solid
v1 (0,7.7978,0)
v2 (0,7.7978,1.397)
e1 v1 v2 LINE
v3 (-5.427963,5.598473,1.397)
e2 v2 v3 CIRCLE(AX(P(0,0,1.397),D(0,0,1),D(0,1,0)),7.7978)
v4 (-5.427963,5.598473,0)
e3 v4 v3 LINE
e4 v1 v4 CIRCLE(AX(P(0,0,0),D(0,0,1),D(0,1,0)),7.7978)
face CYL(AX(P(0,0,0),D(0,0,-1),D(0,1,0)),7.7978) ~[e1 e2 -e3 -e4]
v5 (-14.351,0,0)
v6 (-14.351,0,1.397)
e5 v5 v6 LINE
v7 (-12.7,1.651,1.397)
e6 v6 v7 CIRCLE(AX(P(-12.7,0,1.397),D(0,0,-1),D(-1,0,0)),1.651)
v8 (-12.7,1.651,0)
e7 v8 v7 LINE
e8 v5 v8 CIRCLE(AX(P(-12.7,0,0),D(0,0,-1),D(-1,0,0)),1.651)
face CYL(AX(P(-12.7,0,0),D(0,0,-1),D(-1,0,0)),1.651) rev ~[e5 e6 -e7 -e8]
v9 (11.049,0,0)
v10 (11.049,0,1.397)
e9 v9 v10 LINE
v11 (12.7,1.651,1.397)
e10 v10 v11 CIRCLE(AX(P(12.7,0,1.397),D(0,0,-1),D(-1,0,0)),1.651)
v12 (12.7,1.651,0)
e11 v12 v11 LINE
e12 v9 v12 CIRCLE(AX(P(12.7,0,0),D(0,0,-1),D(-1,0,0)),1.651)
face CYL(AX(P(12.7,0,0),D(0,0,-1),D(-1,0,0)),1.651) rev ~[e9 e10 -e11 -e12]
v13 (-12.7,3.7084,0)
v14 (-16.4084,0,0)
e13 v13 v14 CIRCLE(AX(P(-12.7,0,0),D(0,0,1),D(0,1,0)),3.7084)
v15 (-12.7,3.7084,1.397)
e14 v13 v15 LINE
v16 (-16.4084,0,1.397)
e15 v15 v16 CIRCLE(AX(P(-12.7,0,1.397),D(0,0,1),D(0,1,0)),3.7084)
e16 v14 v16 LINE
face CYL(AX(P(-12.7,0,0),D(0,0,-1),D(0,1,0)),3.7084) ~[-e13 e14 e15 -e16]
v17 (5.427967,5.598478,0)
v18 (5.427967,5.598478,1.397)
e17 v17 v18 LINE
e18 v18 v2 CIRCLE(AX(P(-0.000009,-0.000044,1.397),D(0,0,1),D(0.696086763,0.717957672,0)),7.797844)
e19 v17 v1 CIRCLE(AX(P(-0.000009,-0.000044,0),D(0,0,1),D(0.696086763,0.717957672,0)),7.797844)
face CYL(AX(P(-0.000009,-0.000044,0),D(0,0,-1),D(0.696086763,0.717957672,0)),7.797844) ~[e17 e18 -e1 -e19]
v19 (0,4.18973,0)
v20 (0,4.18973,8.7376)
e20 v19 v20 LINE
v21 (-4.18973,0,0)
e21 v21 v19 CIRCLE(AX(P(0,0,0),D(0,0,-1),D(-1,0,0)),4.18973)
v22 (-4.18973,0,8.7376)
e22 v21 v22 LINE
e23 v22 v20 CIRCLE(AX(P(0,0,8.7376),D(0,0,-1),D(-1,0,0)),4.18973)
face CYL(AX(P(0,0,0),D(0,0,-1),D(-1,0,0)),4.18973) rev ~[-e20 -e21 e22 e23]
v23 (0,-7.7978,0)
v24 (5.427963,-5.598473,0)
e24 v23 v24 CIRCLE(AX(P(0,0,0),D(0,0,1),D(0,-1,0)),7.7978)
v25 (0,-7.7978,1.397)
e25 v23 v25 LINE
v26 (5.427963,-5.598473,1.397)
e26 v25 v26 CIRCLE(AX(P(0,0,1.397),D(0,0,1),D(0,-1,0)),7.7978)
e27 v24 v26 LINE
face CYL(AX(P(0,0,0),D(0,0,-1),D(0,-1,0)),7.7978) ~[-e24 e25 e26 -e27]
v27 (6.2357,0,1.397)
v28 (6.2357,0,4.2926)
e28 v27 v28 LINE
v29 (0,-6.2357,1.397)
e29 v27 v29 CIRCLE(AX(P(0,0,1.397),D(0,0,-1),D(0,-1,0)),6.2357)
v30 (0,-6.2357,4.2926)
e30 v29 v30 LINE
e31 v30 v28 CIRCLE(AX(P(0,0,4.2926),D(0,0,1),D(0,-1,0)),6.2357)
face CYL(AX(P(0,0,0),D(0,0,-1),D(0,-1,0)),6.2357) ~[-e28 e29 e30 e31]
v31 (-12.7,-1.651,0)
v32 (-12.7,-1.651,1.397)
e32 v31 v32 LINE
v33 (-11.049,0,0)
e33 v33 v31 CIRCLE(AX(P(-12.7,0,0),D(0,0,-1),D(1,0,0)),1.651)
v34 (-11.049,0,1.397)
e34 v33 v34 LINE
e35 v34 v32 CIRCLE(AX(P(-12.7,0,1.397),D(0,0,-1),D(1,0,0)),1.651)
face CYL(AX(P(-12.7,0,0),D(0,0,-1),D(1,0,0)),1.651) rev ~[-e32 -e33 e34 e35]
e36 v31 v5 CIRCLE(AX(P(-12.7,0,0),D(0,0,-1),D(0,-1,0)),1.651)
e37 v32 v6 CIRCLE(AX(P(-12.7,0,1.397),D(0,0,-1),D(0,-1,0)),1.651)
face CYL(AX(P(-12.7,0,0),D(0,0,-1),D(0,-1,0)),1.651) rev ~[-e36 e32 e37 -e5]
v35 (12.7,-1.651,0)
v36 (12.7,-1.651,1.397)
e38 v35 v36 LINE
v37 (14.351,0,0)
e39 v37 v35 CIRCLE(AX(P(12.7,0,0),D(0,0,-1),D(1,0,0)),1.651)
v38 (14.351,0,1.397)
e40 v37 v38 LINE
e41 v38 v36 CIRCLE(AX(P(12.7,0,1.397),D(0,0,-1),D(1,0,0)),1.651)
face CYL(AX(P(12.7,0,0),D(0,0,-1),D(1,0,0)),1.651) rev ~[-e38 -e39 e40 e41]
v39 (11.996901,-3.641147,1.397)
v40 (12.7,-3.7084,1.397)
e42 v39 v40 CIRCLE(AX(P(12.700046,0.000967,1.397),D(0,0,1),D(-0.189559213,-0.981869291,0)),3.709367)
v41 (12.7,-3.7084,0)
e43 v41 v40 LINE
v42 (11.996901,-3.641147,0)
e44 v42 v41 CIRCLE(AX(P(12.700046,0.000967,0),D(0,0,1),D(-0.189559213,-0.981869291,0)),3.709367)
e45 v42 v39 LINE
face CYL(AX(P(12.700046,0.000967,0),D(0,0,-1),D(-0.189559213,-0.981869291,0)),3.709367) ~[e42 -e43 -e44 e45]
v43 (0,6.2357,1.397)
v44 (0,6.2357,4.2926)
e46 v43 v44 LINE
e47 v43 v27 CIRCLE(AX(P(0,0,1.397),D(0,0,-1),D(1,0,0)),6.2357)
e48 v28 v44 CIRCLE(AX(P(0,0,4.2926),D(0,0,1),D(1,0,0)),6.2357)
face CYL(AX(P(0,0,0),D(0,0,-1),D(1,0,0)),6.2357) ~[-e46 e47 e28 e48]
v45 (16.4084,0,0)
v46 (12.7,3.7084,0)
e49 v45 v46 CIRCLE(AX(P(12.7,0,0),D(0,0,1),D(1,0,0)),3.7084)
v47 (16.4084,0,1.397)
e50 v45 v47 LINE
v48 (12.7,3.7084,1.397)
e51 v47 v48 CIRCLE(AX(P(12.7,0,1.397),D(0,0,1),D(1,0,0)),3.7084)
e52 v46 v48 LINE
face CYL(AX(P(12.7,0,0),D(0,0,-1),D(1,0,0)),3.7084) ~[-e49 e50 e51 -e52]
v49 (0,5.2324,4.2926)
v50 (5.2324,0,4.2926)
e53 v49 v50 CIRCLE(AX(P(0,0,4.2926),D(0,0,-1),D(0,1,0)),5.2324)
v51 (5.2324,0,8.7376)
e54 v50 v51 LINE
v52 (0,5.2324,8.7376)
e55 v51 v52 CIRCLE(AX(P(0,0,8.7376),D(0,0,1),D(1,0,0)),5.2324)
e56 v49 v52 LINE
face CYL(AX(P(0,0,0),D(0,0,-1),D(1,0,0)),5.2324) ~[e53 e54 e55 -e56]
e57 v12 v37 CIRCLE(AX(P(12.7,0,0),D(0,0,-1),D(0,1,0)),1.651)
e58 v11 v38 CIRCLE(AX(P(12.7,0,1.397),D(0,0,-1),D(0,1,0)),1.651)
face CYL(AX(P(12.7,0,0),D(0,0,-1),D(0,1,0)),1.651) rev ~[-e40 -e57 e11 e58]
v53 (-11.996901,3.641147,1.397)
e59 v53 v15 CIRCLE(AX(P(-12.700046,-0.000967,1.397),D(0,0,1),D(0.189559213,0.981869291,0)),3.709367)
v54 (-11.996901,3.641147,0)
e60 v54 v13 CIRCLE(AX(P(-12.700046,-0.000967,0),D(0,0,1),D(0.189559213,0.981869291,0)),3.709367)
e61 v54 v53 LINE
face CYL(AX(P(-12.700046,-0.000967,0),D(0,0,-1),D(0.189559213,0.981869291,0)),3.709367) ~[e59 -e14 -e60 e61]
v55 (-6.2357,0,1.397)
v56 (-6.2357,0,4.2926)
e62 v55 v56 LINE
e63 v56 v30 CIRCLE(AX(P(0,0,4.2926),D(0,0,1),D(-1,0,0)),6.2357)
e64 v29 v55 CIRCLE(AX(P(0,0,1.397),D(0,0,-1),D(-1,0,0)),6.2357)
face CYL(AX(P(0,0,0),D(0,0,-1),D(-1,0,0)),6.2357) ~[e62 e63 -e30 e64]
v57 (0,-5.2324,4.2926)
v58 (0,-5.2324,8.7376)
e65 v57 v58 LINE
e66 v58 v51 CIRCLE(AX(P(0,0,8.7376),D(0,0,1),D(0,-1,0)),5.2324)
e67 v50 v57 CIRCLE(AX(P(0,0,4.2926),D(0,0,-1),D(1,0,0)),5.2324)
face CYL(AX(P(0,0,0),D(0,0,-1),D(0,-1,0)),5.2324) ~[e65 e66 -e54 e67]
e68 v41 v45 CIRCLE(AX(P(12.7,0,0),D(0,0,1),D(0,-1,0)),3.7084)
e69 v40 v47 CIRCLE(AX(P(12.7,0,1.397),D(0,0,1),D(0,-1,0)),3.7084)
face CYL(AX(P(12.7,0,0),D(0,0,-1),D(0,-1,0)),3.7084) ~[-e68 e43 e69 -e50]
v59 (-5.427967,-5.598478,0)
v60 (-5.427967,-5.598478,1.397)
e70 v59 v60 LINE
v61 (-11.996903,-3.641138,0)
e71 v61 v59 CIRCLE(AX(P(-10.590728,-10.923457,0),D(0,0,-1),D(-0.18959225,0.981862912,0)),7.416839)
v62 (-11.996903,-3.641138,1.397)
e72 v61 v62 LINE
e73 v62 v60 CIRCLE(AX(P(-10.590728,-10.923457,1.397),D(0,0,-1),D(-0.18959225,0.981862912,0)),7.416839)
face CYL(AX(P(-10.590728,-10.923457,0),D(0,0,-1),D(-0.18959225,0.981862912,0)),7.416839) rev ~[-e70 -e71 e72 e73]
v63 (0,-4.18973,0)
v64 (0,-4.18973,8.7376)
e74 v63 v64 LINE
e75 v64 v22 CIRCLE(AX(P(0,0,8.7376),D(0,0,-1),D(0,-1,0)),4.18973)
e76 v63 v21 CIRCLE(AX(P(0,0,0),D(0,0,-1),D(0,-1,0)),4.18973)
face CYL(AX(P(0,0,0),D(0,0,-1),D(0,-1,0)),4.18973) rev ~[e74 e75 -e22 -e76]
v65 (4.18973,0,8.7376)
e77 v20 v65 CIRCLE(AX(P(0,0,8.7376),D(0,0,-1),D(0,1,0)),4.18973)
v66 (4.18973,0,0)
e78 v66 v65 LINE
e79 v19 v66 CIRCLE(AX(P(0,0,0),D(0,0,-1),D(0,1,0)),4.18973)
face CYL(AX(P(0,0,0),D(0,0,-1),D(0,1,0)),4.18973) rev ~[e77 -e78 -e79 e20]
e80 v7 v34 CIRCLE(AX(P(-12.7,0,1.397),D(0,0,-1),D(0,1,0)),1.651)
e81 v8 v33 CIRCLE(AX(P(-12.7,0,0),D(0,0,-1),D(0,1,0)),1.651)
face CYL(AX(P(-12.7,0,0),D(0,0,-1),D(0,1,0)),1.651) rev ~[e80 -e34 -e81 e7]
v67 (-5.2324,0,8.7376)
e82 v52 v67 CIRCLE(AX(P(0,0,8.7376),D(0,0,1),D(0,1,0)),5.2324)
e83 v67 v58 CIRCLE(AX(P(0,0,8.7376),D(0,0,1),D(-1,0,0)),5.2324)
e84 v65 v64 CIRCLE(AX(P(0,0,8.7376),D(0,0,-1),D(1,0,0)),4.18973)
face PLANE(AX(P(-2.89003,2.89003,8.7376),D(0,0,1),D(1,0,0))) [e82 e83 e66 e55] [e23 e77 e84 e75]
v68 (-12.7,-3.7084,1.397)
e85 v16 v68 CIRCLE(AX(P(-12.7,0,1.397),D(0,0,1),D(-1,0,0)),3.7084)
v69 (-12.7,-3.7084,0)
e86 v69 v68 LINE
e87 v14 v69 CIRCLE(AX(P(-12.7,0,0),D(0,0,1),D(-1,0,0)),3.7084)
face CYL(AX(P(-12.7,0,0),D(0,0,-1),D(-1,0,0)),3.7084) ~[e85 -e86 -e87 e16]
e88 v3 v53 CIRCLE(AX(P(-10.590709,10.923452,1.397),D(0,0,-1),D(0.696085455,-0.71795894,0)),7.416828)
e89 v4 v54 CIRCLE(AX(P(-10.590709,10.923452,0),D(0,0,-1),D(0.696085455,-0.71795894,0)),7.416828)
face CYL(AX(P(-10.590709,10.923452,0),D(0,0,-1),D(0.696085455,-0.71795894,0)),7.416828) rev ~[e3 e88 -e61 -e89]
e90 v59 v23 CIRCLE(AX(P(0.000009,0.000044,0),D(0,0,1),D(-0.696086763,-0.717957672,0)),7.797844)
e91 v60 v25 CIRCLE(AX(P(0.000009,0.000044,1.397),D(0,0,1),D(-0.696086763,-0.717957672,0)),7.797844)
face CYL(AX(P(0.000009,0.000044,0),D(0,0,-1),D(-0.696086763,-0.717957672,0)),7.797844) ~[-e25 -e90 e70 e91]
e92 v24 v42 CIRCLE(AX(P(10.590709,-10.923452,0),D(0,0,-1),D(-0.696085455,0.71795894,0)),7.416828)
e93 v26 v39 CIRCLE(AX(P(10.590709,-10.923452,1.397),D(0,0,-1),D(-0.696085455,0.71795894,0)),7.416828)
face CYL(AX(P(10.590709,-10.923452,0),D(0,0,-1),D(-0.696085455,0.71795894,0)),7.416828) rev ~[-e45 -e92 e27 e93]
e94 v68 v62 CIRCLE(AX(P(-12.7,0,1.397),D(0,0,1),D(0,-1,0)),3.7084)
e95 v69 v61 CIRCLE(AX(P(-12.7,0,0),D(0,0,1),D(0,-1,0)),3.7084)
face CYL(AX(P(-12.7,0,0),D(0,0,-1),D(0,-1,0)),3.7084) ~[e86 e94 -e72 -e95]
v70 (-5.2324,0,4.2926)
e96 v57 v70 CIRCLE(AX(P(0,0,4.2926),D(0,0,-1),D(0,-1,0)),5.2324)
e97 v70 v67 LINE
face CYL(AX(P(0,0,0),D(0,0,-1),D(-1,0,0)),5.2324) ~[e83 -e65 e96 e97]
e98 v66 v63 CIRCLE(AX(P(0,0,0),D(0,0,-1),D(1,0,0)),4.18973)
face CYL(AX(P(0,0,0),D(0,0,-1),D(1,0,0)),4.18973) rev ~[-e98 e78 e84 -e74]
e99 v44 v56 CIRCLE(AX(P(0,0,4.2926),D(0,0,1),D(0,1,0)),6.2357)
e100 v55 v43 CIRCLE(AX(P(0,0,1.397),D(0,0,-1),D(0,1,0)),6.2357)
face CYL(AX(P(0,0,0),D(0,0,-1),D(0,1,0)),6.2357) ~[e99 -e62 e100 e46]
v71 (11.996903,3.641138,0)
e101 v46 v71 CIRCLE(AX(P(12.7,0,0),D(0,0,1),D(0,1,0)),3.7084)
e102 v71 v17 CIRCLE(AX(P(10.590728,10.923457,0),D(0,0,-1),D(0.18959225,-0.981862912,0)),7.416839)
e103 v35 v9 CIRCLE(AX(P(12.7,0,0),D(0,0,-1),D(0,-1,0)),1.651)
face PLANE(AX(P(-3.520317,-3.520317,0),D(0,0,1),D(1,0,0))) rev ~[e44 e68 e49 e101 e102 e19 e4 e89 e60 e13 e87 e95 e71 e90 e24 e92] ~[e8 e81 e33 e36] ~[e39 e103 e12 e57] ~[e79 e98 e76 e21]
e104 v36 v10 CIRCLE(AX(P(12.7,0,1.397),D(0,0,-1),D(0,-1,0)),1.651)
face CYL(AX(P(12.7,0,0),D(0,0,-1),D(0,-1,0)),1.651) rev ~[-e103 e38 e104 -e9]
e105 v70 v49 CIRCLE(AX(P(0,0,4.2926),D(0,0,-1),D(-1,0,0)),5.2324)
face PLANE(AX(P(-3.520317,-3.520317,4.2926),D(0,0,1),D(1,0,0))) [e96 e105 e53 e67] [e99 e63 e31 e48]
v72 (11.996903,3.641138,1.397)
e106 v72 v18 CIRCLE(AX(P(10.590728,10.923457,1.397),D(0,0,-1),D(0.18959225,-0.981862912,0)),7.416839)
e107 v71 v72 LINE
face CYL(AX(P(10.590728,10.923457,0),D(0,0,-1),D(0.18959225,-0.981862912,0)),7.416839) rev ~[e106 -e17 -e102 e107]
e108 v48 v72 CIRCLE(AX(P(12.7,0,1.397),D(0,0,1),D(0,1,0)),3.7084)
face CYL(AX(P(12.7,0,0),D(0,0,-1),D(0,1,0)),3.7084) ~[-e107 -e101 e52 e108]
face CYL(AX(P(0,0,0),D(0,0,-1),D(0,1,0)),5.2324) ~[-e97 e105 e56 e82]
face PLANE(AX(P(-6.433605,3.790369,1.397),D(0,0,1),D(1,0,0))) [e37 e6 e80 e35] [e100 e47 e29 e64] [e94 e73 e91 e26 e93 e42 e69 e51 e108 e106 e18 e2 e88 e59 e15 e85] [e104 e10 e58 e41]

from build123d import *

# Parameters (mm, degrees)
F1_DEPTH = 1.397
F2_DEPTH = 8.7376
F3_DEPTH = 4.2926


# Not quite as in the source:
# - ends of sketch curves that miss each other by under 0.0002 mm in the source are joined


with BuildPart() as f1:
    # F0 (on Top) → F1 (new body)
    with BuildSketch(Plane.XY):
        with BuildLine():
            ThreePointArc((-6.2357, 0), (-4.4093057554, 4.4093057554), (0, 6.2357))
            Line((0, 6.2357), (0, 7.7978))
            ThreePointArc((0, 7.7978), (-2.9283023582, 7.2270831003), (-5.4279628833, 5.5984733435))
            ThreePointArc((-5.4279628833, 5.5984733435), (-8.4727612853, 3.8154532948), (-11.9969014896, 3.6411465506))
            ThreePointArc((-11.9969014896, 3.6411465506), (-12.3468465773, 3.6915461828), (-12.7, 3.7084))
            Line((-12.7, 3.7084), (-12.7, 1.651))
            ThreePointArc((-12.7, 1.651), (-11.5325667043, 1.1674332957), (-11.049, 0))
            Line((-11.049, 0), (-6.2357, 0))
        make_face()
        with BuildLine():
            ThreePointArc((-14.351, 0), (-13.8674332957, 1.1674332957), (-12.7, 1.651))
            Line((-12.7, 1.651), (-12.7, 3.7084))
            ThreePointArc((-12.7, 3.7084), (-15.3222347874, 2.6222347874), (-16.4084, 0))
            Line((-16.4084, 0), (-14.351, 0))
        make_face()
        with BuildLine():
            Line((-12.7, -3.7084), (-12.7, -1.651))
            ThreePointArc((-12.7, -1.651), (-13.8674332957, -1.1674332957), (-14.351, 0))
            Line((-14.351, 0), (-16.4084, 0))
            ThreePointArc((-16.4084, 0), (-15.3222347874, -2.6222347874), (-12.7, -3.7084))
        make_face()
        with BuildLine():
            Line((0, -7.7978), (0, -6.2357))
            ThreePointArc((0, -6.2357), (-4.4093057554, -4.4093057554), (-6.2357, 0))
            Line((-6.2357, 0), (-11.049, 0))
            ThreePointArc((-11.049, 0), (-11.5325667043, -1.1674332957), (-12.7, -1.651))
            Line((-12.7, -1.651), (-12.7, -3.7084))
            ThreePointArc((-12.7, -3.7084), (-12.3468465773, -3.6915461828), (-11.9969031552, -3.6411379247))
            ThreePointArc((-11.9969031552, -3.6411379247), (-8.4727612853, -3.8154532948), (-5.4279673549, -5.5984779556))
            ThreePointArc((-5.4279673549, -5.5984779556), (-2.9283023582, -7.2270831003), (0, -7.7978))
        make_face()
        with BuildLine():
            ThreePointArc((0, -6.2357), (4.4093057554, -4.4093057554), (6.2357, 0))
            Line((6.2357, 0), (5.2324, 0))
            ThreePointArc((5.2324, 0), (3.6998655219, -3.6998655219), (0, -5.2324))
            Line((0, -5.2324), (0, -6.2357))
        make_face()
        with BuildLine():
            ThreePointArc((-6.2357, 0), (-4.4093057554, -4.4093057554), (0, -6.2357))
            Line((0, -6.2357), (0, -5.2324))
            ThreePointArc((0, -5.2324), (-3.6998655219, -3.6998655219), (-5.2324, 0))
            Line((-5.2324, 0), (-6.2357, 0))
        make_face()
        with BuildLine():
            Line((0, 5.2324), (0, 6.2357))
            ThreePointArc((0, 6.2357), (-4.4093057554, 4.4093057554), (-6.2357, 0))
            Line((-6.2357, 0), (-5.2324, 0))
            ThreePointArc((-5.2324, 0), (-3.6998655219, 3.6998655219), (0, 5.2324))
        make_face()
        with BuildLine():
            Line((5.2324, 0), (6.2357, 0))
            ThreePointArc((6.2357, 0), (4.4093057554, 4.4093057554), (0, 6.2357))
            Line((0, 6.2357), (0, 5.2324))
            ThreePointArc((0, 5.2324), (3.6998655219, 3.6998655219), (5.2324, 0))
        make_face()
        with BuildLine():
            ThreePointArc((0, 6.2357), (4.4093057554, 4.4093057554), (6.2357, 0))
            Line((6.2357, 0), (11.049, 0))
            ThreePointArc((11.049, 0), (11.5325667043, 1.1674332957), (12.7, 1.651))
            Line((12.7, 1.651), (12.7, 3.7084))
            ThreePointArc((12.7, 3.7084), (12.3468465773, 3.6915461828), (11.9969031552, 3.6411379247))
            ThreePointArc((11.9969031552, 3.6411379247), (8.4727612853, 3.8154532948), (5.4279673549, 5.5984779556))
            ThreePointArc((5.4279673549, 5.5984779556), (2.9283023582, 7.2270831003), (0, 7.7978))
            Line((0, 7.7978), (0, 6.2357))
        make_face()
        with BuildLine():
            Line((11.049, 0), (6.2357, 0))
            ThreePointArc((6.2357, 0), (4.4093057554, -4.4093057554), (0, -6.2357))
            Line((0, -6.2357), (0, -7.7978))
            ThreePointArc((0, -7.7978), (2.9283023582, -7.2270831003), (5.4279628833, -5.5984733435))
            ThreePointArc((5.4279628833, -5.5984733435), (8.4727612853, -3.8154532948), (11.9969014896, -3.6411465506))
            ThreePointArc((11.9969014896, -3.6411465506), (12.3468465773, -3.6915461828), (12.7, -3.7084))
            Line((12.7, -3.7084), (12.7, -1.651))
            ThreePointArc((12.7, -1.651), (11.5325667043, -1.1674332957), (11.049, 0))
        make_face()
        with BuildLine():
            ThreePointArc((14.351, 0), (13.8674332957, -1.1674332957), (12.7, -1.651))
            Line((12.7, -1.651), (12.7, -3.7084))
            ThreePointArc((12.7, -3.7084), (15.3222347874, -2.6222347874), (16.4084, 0))
            Line((16.4084, 0), (14.351, 0))
        make_face()
        with BuildLine():
            Line((12.7, 3.7084), (12.7, 1.651))
            ThreePointArc((12.7, 1.651), (13.8674332957, 1.1674332957), (14.351, 0))
            Line((14.351, 0), (16.4084, 0))
            ThreePointArc((16.4084, 0), (15.3222347874, 2.6222347874), (12.7, 3.7084))
        make_face()
    extrude(amount=F1_DEPTH)

    # F0 (on Top) → F2 (join)
    with BuildSketch(Plane.XY):
        with BuildLine():
            Line((0, 4.18973), (0, 5.2324))
            ThreePointArc((0, 5.2324), (-3.6998655219, 3.6998655219), (-5.2324, 0))
            Line((-5.2324, 0), (-4.18973, 0))
            ThreePointArc((-4.18973, 0), (-2.9625864943, 2.9625864943), (0, 4.18973))
        make_face()
        with BuildLine():
            Line((4.18973, 0), (5.2324, 0))
            ThreePointArc((5.2324, 0), (3.6998655219, 3.6998655219), (0, 5.2324))
            Line((0, 5.2324), (0, 4.18973))
            ThreePointArc((0, 4.18973), (2.9625864943, 2.9625864943), (4.18973, 0))
        make_face()
        with BuildLine():
            ThreePointArc((0, -5.2324), (3.6998655219, -3.6998655219), (5.2324, 0))
            Line((5.2324, 0), (4.18973, 0))
            ThreePointArc((4.18973, 0), (2.9625864943, -2.9625864943), (0, -4.18973))
            Line((0, -4.18973), (0, -5.2324))
        make_face()
        with BuildLine():
            ThreePointArc((-5.2324, 0), (-3.6998655219, -3.6998655219), (0, -5.2324))
            Line((0, -5.2324), (0, -4.18973))
            ThreePointArc((0, -4.18973), (-2.9625864943, -2.9625864943), (-4.18973, 0))
            Line((-4.18973, 0), (-5.2324, 0))
        make_face()
    extrude(amount=F2_DEPTH)

    # F0 (on Top) → F3 (join)
    with BuildSketch(Plane.XY):
        with BuildLine():
            ThreePointArc((-6.2357, 0), (-4.4093057554, -4.4093057554), (0, -6.2357))
            Line((0, -6.2357), (0, -5.2324))
            ThreePointArc((0, -5.2324), (-3.6998655219, -3.6998655219), (-5.2324, 0))
            Line((-5.2324, 0), (-6.2357, 0))
        make_face()
        with BuildLine():
            ThreePointArc((0, -6.2357), (4.4093057554, -4.4093057554), (6.2357, 0))
            Line((6.2357, 0), (5.2324, 0))
            ThreePointArc((5.2324, 0), (3.6998655219, -3.6998655219), (0, -5.2324))
            Line((0, -5.2324), (0, -6.2357))
        make_face()
        with BuildLine():
            Line((5.2324, 0), (6.2357, 0))
            ThreePointArc((6.2357, 0), (4.4093057554, 4.4093057554), (0, 6.2357))
            Line((0, 6.2357), (0, 5.2324))
            ThreePointArc((0, 5.2324), (3.6998655219, 3.6998655219), (5.2324, 0))
        make_face()
        with BuildLine():
            Line((0, 5.2324), (0, 6.2357))
            ThreePointArc((0, 6.2357), (-4.4093057554, 4.4093057554), (-6.2357, 0))
            Line((-6.2357, 0), (-5.2324, 0))
            ThreePointArc((-5.2324, 0), (-3.6998655219, 3.6998655219), (0, 5.2324))
        make_face()
    extrude(amount=F3_DEPTH)


solid = f1.part
